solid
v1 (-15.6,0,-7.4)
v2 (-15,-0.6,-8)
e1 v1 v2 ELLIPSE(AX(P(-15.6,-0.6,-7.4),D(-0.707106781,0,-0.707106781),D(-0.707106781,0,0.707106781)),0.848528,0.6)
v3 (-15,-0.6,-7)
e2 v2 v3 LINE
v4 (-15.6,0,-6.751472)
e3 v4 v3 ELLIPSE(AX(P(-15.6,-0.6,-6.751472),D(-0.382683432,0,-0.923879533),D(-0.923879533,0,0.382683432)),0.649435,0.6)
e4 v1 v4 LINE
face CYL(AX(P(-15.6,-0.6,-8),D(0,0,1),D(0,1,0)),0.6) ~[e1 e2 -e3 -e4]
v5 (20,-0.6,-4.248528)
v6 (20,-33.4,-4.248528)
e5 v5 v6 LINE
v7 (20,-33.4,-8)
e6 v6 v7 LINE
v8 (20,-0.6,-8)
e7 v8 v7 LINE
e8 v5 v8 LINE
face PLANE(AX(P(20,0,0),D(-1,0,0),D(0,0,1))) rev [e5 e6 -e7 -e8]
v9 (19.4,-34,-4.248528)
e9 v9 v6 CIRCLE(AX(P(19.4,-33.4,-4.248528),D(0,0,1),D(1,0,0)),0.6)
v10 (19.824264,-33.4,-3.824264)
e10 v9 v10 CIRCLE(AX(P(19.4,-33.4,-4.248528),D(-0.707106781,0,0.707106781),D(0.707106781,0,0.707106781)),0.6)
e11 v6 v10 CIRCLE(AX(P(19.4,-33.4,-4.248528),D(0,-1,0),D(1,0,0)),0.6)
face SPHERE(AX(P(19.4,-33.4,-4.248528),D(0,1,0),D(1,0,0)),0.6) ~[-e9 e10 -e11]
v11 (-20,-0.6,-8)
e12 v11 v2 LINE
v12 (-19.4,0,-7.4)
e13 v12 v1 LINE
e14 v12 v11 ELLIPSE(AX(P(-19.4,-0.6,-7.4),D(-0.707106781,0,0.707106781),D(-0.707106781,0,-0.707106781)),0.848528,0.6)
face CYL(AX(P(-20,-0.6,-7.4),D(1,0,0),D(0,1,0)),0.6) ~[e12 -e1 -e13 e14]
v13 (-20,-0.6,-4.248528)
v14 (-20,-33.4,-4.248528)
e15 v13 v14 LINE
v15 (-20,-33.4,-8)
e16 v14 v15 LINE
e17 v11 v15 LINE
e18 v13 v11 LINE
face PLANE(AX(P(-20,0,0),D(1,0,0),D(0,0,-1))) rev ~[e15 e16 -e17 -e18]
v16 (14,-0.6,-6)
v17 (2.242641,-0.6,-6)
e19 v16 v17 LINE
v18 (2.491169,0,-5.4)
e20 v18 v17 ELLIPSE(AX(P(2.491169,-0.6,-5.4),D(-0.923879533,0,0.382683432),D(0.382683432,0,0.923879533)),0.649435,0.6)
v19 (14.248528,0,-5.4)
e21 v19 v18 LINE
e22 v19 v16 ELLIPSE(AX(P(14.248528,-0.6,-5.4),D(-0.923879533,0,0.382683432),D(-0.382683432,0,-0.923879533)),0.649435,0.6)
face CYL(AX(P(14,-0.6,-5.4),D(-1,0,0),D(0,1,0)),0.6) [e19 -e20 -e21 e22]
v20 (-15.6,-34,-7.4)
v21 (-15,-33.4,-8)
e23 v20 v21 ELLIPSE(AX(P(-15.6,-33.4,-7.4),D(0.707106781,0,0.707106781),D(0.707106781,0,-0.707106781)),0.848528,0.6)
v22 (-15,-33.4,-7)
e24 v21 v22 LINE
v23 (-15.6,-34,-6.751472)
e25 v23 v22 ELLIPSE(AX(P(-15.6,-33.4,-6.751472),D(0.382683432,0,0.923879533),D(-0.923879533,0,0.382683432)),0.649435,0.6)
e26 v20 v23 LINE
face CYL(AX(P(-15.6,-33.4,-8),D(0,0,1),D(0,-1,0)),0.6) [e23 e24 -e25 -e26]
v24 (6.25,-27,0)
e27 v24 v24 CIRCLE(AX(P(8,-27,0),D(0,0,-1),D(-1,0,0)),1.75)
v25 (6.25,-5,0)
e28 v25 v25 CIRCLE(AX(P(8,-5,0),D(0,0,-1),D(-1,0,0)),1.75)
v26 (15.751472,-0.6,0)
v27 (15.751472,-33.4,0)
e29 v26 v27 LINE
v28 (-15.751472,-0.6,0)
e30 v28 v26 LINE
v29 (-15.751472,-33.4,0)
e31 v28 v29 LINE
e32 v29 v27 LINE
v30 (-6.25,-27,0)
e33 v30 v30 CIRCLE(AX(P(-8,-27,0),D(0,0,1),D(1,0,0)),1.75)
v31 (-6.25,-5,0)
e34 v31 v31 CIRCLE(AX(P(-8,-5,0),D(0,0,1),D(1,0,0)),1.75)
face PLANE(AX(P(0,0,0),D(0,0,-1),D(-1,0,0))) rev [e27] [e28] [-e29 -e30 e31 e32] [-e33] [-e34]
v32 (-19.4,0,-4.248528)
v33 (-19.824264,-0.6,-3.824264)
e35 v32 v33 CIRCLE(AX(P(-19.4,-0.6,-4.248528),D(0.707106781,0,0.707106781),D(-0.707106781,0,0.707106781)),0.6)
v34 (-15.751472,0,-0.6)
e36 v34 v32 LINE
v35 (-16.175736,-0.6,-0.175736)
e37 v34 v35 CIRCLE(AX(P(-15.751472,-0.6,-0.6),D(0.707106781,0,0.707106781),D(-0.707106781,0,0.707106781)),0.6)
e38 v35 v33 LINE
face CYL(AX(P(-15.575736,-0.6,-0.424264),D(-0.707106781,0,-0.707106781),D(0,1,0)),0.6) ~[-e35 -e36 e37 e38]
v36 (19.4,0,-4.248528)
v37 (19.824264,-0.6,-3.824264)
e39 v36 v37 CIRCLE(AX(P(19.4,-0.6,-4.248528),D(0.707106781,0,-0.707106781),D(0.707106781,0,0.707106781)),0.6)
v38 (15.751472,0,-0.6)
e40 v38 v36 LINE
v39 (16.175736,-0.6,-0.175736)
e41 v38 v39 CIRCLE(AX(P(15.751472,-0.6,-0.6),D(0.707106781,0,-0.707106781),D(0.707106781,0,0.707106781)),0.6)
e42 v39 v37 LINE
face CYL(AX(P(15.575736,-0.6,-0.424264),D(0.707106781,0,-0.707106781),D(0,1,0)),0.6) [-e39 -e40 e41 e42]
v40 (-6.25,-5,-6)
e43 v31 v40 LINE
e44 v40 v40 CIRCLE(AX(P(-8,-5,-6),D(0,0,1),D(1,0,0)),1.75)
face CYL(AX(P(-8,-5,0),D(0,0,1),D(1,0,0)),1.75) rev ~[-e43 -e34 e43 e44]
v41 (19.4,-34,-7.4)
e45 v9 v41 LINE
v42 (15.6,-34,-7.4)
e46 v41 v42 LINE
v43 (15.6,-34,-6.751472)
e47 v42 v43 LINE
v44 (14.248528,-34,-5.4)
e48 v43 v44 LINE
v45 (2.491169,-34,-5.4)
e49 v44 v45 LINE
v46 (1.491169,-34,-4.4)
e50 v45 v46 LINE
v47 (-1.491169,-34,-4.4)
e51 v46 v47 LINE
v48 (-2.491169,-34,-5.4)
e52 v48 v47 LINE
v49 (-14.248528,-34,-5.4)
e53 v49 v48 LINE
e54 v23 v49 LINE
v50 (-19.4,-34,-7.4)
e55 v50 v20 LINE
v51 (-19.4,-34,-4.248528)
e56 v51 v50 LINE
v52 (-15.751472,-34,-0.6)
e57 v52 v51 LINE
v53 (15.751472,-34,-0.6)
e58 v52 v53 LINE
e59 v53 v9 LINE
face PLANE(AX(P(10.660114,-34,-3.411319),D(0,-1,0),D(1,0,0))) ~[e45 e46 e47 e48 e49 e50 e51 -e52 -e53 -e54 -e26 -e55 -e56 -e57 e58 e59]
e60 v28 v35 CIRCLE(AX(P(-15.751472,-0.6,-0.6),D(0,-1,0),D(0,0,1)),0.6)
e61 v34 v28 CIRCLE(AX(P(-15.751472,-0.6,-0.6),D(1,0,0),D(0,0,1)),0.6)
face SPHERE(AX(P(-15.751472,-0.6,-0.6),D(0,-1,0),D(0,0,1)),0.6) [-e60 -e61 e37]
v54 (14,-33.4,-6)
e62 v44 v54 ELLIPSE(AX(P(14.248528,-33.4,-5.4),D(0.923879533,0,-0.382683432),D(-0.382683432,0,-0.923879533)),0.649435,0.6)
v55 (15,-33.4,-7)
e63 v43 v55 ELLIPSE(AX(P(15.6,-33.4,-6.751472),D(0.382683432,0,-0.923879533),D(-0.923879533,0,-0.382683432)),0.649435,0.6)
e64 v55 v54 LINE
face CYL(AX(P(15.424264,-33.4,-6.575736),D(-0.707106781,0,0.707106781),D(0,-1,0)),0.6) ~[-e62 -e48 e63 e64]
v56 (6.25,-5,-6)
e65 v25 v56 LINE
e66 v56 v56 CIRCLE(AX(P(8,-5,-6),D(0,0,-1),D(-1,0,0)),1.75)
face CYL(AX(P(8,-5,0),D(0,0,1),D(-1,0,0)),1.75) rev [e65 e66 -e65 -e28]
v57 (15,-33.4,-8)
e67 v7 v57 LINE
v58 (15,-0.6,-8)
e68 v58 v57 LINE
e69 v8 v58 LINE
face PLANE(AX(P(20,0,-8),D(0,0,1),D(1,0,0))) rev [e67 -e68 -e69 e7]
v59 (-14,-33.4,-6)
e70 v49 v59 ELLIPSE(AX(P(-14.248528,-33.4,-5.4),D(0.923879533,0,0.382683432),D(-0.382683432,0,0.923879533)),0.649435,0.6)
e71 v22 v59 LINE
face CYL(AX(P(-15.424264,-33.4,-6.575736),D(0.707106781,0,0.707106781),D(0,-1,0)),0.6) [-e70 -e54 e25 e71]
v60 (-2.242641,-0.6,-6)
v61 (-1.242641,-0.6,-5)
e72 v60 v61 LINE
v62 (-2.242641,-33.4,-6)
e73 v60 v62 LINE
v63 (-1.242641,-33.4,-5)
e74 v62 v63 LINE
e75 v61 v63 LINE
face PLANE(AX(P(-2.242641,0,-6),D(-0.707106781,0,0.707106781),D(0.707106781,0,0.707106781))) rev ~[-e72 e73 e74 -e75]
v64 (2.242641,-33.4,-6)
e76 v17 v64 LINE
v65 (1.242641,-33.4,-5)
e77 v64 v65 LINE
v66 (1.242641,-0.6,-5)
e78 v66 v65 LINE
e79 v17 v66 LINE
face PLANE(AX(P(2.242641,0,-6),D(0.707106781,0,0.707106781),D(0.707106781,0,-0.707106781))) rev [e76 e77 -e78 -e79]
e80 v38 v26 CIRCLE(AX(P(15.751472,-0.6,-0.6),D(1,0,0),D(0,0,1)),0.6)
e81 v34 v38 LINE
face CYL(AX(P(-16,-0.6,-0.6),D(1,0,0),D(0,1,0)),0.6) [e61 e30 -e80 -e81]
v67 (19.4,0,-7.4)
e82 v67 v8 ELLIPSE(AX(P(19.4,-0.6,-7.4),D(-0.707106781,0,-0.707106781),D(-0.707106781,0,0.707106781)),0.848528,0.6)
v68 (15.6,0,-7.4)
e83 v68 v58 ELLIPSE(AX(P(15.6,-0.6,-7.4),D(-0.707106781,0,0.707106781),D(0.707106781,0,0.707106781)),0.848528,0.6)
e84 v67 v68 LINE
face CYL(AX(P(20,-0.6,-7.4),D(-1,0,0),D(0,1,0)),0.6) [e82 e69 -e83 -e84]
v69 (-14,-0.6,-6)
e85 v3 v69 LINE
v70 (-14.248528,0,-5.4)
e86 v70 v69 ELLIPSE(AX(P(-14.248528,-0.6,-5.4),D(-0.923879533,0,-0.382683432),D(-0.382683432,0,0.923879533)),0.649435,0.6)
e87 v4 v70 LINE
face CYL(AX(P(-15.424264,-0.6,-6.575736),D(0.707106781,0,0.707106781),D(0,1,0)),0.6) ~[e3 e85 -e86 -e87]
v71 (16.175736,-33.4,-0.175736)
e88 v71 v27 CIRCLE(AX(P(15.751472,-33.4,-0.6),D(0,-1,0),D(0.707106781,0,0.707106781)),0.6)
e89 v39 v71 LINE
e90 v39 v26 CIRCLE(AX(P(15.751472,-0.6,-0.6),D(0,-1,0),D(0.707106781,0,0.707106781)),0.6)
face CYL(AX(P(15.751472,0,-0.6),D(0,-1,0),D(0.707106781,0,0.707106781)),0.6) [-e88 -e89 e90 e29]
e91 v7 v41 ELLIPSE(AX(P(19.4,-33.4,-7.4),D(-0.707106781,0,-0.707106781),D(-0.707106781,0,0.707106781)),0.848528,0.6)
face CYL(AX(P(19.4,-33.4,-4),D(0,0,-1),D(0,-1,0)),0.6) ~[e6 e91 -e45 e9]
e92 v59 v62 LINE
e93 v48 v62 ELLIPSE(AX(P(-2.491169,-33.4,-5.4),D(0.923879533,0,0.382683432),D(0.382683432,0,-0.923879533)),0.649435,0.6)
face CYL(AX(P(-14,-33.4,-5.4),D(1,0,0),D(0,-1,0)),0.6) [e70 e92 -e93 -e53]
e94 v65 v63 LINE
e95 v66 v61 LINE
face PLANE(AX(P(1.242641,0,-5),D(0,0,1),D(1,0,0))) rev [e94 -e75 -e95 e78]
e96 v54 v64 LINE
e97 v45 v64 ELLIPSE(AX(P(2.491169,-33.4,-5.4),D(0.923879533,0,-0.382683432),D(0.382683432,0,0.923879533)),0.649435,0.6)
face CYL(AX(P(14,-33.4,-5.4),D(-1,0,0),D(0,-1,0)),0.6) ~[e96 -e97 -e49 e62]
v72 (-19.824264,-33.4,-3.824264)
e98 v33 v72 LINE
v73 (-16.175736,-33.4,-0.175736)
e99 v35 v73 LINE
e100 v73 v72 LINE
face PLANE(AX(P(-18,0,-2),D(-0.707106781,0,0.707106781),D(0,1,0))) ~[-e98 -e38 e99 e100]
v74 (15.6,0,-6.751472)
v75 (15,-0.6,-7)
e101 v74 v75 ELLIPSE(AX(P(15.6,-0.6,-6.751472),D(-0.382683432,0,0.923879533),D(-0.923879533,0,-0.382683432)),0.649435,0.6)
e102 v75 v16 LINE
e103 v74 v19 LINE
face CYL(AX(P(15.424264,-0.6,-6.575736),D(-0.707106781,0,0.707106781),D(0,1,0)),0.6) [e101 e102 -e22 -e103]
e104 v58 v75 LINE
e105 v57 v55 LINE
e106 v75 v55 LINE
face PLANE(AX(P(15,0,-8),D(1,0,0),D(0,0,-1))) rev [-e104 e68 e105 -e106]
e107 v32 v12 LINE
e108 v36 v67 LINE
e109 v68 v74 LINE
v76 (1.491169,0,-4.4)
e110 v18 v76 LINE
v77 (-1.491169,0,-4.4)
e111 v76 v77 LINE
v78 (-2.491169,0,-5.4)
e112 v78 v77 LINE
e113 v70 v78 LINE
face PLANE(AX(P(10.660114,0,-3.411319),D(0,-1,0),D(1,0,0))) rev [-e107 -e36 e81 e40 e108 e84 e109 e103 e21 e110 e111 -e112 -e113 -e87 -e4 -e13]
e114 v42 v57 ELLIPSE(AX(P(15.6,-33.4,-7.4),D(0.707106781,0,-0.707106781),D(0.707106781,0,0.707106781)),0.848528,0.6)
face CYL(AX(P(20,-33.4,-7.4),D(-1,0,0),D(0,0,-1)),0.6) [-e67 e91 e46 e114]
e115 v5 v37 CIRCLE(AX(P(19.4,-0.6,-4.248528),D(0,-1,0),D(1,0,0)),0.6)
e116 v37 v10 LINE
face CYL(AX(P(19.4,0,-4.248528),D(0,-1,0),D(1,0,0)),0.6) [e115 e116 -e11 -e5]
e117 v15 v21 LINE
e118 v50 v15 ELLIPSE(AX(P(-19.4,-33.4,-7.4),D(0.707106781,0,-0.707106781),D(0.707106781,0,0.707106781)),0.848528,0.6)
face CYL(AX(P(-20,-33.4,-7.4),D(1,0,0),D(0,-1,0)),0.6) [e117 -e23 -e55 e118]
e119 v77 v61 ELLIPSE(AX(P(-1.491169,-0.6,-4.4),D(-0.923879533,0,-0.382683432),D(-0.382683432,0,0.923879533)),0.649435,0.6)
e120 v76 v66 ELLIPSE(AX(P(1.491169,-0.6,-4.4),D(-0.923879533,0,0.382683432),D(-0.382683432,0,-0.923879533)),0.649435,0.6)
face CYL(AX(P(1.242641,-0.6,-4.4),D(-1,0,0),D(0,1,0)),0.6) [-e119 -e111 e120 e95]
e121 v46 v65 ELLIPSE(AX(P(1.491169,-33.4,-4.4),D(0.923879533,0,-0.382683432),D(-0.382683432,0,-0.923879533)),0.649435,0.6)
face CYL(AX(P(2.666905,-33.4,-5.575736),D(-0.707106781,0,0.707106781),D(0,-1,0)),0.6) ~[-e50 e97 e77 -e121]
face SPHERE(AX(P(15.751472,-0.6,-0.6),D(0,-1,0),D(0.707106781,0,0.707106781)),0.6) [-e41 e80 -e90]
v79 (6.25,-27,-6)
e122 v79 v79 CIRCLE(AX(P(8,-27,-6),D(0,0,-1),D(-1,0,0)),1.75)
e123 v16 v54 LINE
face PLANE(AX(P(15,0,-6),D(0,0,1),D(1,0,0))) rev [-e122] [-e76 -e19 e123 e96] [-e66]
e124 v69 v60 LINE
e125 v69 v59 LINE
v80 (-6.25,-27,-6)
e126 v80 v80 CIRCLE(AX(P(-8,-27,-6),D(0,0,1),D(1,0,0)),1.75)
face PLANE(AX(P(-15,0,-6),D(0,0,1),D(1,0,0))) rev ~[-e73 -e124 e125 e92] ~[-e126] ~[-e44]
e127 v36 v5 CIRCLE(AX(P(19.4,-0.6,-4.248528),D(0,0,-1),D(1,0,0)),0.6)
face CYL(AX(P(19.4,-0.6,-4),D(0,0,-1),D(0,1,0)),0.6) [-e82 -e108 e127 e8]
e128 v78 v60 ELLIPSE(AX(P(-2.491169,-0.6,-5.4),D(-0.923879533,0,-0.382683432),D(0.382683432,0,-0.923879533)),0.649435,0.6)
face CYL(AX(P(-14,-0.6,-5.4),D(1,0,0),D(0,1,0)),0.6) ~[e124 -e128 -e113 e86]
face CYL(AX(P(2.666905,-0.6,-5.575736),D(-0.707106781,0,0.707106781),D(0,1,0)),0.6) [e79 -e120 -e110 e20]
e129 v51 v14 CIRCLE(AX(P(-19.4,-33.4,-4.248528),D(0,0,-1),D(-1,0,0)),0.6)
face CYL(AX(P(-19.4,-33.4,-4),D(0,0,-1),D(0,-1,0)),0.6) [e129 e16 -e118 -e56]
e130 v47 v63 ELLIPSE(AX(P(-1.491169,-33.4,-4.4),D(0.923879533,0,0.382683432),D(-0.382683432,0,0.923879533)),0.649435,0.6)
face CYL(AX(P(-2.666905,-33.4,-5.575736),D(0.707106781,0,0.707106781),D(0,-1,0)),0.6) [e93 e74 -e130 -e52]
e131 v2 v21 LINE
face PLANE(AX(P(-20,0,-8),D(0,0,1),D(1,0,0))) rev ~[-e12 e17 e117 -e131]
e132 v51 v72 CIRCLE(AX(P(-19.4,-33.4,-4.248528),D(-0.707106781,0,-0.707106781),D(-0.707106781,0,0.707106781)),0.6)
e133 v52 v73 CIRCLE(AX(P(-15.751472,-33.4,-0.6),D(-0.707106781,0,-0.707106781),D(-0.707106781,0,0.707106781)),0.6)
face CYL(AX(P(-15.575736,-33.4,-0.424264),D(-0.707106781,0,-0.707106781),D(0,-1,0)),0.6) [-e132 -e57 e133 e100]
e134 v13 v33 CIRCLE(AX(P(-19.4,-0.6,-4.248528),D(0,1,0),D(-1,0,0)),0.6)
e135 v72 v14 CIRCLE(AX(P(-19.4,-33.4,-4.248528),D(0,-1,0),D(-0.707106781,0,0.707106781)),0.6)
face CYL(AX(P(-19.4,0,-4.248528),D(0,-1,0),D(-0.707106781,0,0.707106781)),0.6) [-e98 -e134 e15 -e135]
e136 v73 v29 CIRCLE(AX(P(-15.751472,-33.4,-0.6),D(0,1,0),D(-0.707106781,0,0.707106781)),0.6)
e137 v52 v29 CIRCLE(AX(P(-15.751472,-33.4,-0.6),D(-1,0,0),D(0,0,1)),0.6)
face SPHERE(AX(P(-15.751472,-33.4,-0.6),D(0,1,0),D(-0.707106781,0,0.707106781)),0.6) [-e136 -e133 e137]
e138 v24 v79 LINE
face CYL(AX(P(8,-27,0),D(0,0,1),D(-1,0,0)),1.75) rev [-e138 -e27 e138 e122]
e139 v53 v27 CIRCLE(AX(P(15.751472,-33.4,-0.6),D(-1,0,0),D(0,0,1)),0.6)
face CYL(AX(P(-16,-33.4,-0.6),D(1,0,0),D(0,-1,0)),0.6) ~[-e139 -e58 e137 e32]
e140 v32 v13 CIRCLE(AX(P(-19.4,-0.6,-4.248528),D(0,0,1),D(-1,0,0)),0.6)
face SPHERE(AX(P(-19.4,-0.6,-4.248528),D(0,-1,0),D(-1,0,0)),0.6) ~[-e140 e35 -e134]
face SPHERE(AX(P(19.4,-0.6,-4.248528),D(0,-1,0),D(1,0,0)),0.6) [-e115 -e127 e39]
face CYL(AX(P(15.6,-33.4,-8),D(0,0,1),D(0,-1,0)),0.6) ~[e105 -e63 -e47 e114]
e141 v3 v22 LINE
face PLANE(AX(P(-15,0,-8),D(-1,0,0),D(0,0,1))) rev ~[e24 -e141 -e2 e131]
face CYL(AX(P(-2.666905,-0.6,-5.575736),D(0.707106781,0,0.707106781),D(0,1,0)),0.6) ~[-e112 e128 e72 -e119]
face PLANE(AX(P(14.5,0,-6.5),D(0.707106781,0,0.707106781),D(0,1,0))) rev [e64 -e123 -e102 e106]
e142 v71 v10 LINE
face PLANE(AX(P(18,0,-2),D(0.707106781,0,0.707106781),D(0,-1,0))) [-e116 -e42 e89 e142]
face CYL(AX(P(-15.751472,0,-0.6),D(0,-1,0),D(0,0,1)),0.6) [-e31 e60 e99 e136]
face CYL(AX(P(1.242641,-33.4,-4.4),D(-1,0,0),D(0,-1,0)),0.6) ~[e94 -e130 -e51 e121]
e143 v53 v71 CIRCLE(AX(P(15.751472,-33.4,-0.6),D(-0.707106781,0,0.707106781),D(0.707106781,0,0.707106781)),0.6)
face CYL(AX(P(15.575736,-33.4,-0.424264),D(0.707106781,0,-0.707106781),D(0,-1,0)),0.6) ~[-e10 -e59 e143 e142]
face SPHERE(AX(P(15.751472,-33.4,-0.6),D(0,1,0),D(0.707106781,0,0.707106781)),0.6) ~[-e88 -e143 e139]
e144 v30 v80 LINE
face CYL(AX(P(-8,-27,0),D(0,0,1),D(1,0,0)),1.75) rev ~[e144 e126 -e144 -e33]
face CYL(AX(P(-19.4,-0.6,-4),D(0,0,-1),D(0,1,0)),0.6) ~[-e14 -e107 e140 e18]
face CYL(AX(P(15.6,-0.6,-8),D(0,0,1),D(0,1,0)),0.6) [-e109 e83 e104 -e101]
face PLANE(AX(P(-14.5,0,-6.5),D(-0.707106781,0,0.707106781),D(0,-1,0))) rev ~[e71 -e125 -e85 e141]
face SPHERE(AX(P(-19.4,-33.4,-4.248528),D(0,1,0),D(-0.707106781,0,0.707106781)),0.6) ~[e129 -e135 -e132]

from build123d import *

# Parameters (mm, degrees)
F1_DEPTH = 34
F2_R     = 1.75
F3_DEPTH = 8.001
F4_SIZE  = 4
F5_SIZE  = 1
F8_R     = 0.6


with BuildPart() as f1:
    # F0 (on Front) → F1 (new body)
    with BuildSketch(Plane.XZ):
        Polygon((0, -5), (0, 0), (-20, 0), (-20, -8), (-15, -8), (-15, -6), (-2.2426406871, -6), (-1.2426406871, -5), align=None)
    extrude(amount=F1_DEPTH)

    # F2 (on face) → F3 (cut, through all)
    with BuildSketch(Plane.XY):
        with Locations((-8, -5)):
            Circle(F2_R)
        with Locations((-8, -27)):
            Circle(F2_R)
    extrude(amount=-F3_DEPTH, mode=Mode.SUBTRACT)

    # F4
    f4_edges = [f1.edges().sort_by_distance(p)[0] for p in [
        (-20, -17, 0),
    ]]
    chamfer(f4_edges, length=F4_SIZE)

    # F5
    f5_edges = [f1.edges().sort_by_distance(p)[0] for p in [
        (-15, -17, -6),
    ]]
    chamfer(f5_edges, length=F5_SIZE)

    # F6: F1 across face


with BuildPart() as f1_1:
    add(f1.part)
    add(f1.part.mirror(Plane(origin=(0, -17, -2.5), x_dir=(0, 1, 0), z_dir=(1, 0, 0))))

    # F8
    f8_edges = [f1_1.edges().sort_by_distance(p)[0] for p in [
        (20, -17, -4),
        (16, -17, 0),
        (-18, 0, -2),
        (-16, -17, 0),
        (-20, -17, -4),
        (-18, -34, -2),
        (-15, 0, -7.5),
        (-14.5, 0, -6.5),
        (-8.12132, 0, -6),
        (-1.742641, 0, -5.5),
        (0, 0, -5),
        (1.742641, 0, -5.5),
        (8.12132, 0, -6),
        (14.5, 0, -6.5),
        (15, 0, -7.5),
        (17.5, 0, -8),
        (20, 0, -6),
        (18, 0, -2),
        (0, 0, 0),
        (-20, 0, -6),
        (-17.5, 0, -8),
        (-17.5, -34, -8),
        (-15, -34, -7.5),
        (-14.5, -34, -6.5),
        (-8.12132, -34, -6),
        (-1.742641, -34, -5.5),
        (0, -34, -5),
        (1.742641, -34, -5.5),
        (8.12132, -34, -6),
        (14.5, -34, -6.5),
        (15, -34, -7.5),
        (17.5, -34, -8),
        (20, -34, -6),
        (18, -34, -2),
        (0, -34, 0),
        (-20, -34, -6),
    ]]
    fillet(f8_edges, radius=F8_R)


solid = f1_1.part
